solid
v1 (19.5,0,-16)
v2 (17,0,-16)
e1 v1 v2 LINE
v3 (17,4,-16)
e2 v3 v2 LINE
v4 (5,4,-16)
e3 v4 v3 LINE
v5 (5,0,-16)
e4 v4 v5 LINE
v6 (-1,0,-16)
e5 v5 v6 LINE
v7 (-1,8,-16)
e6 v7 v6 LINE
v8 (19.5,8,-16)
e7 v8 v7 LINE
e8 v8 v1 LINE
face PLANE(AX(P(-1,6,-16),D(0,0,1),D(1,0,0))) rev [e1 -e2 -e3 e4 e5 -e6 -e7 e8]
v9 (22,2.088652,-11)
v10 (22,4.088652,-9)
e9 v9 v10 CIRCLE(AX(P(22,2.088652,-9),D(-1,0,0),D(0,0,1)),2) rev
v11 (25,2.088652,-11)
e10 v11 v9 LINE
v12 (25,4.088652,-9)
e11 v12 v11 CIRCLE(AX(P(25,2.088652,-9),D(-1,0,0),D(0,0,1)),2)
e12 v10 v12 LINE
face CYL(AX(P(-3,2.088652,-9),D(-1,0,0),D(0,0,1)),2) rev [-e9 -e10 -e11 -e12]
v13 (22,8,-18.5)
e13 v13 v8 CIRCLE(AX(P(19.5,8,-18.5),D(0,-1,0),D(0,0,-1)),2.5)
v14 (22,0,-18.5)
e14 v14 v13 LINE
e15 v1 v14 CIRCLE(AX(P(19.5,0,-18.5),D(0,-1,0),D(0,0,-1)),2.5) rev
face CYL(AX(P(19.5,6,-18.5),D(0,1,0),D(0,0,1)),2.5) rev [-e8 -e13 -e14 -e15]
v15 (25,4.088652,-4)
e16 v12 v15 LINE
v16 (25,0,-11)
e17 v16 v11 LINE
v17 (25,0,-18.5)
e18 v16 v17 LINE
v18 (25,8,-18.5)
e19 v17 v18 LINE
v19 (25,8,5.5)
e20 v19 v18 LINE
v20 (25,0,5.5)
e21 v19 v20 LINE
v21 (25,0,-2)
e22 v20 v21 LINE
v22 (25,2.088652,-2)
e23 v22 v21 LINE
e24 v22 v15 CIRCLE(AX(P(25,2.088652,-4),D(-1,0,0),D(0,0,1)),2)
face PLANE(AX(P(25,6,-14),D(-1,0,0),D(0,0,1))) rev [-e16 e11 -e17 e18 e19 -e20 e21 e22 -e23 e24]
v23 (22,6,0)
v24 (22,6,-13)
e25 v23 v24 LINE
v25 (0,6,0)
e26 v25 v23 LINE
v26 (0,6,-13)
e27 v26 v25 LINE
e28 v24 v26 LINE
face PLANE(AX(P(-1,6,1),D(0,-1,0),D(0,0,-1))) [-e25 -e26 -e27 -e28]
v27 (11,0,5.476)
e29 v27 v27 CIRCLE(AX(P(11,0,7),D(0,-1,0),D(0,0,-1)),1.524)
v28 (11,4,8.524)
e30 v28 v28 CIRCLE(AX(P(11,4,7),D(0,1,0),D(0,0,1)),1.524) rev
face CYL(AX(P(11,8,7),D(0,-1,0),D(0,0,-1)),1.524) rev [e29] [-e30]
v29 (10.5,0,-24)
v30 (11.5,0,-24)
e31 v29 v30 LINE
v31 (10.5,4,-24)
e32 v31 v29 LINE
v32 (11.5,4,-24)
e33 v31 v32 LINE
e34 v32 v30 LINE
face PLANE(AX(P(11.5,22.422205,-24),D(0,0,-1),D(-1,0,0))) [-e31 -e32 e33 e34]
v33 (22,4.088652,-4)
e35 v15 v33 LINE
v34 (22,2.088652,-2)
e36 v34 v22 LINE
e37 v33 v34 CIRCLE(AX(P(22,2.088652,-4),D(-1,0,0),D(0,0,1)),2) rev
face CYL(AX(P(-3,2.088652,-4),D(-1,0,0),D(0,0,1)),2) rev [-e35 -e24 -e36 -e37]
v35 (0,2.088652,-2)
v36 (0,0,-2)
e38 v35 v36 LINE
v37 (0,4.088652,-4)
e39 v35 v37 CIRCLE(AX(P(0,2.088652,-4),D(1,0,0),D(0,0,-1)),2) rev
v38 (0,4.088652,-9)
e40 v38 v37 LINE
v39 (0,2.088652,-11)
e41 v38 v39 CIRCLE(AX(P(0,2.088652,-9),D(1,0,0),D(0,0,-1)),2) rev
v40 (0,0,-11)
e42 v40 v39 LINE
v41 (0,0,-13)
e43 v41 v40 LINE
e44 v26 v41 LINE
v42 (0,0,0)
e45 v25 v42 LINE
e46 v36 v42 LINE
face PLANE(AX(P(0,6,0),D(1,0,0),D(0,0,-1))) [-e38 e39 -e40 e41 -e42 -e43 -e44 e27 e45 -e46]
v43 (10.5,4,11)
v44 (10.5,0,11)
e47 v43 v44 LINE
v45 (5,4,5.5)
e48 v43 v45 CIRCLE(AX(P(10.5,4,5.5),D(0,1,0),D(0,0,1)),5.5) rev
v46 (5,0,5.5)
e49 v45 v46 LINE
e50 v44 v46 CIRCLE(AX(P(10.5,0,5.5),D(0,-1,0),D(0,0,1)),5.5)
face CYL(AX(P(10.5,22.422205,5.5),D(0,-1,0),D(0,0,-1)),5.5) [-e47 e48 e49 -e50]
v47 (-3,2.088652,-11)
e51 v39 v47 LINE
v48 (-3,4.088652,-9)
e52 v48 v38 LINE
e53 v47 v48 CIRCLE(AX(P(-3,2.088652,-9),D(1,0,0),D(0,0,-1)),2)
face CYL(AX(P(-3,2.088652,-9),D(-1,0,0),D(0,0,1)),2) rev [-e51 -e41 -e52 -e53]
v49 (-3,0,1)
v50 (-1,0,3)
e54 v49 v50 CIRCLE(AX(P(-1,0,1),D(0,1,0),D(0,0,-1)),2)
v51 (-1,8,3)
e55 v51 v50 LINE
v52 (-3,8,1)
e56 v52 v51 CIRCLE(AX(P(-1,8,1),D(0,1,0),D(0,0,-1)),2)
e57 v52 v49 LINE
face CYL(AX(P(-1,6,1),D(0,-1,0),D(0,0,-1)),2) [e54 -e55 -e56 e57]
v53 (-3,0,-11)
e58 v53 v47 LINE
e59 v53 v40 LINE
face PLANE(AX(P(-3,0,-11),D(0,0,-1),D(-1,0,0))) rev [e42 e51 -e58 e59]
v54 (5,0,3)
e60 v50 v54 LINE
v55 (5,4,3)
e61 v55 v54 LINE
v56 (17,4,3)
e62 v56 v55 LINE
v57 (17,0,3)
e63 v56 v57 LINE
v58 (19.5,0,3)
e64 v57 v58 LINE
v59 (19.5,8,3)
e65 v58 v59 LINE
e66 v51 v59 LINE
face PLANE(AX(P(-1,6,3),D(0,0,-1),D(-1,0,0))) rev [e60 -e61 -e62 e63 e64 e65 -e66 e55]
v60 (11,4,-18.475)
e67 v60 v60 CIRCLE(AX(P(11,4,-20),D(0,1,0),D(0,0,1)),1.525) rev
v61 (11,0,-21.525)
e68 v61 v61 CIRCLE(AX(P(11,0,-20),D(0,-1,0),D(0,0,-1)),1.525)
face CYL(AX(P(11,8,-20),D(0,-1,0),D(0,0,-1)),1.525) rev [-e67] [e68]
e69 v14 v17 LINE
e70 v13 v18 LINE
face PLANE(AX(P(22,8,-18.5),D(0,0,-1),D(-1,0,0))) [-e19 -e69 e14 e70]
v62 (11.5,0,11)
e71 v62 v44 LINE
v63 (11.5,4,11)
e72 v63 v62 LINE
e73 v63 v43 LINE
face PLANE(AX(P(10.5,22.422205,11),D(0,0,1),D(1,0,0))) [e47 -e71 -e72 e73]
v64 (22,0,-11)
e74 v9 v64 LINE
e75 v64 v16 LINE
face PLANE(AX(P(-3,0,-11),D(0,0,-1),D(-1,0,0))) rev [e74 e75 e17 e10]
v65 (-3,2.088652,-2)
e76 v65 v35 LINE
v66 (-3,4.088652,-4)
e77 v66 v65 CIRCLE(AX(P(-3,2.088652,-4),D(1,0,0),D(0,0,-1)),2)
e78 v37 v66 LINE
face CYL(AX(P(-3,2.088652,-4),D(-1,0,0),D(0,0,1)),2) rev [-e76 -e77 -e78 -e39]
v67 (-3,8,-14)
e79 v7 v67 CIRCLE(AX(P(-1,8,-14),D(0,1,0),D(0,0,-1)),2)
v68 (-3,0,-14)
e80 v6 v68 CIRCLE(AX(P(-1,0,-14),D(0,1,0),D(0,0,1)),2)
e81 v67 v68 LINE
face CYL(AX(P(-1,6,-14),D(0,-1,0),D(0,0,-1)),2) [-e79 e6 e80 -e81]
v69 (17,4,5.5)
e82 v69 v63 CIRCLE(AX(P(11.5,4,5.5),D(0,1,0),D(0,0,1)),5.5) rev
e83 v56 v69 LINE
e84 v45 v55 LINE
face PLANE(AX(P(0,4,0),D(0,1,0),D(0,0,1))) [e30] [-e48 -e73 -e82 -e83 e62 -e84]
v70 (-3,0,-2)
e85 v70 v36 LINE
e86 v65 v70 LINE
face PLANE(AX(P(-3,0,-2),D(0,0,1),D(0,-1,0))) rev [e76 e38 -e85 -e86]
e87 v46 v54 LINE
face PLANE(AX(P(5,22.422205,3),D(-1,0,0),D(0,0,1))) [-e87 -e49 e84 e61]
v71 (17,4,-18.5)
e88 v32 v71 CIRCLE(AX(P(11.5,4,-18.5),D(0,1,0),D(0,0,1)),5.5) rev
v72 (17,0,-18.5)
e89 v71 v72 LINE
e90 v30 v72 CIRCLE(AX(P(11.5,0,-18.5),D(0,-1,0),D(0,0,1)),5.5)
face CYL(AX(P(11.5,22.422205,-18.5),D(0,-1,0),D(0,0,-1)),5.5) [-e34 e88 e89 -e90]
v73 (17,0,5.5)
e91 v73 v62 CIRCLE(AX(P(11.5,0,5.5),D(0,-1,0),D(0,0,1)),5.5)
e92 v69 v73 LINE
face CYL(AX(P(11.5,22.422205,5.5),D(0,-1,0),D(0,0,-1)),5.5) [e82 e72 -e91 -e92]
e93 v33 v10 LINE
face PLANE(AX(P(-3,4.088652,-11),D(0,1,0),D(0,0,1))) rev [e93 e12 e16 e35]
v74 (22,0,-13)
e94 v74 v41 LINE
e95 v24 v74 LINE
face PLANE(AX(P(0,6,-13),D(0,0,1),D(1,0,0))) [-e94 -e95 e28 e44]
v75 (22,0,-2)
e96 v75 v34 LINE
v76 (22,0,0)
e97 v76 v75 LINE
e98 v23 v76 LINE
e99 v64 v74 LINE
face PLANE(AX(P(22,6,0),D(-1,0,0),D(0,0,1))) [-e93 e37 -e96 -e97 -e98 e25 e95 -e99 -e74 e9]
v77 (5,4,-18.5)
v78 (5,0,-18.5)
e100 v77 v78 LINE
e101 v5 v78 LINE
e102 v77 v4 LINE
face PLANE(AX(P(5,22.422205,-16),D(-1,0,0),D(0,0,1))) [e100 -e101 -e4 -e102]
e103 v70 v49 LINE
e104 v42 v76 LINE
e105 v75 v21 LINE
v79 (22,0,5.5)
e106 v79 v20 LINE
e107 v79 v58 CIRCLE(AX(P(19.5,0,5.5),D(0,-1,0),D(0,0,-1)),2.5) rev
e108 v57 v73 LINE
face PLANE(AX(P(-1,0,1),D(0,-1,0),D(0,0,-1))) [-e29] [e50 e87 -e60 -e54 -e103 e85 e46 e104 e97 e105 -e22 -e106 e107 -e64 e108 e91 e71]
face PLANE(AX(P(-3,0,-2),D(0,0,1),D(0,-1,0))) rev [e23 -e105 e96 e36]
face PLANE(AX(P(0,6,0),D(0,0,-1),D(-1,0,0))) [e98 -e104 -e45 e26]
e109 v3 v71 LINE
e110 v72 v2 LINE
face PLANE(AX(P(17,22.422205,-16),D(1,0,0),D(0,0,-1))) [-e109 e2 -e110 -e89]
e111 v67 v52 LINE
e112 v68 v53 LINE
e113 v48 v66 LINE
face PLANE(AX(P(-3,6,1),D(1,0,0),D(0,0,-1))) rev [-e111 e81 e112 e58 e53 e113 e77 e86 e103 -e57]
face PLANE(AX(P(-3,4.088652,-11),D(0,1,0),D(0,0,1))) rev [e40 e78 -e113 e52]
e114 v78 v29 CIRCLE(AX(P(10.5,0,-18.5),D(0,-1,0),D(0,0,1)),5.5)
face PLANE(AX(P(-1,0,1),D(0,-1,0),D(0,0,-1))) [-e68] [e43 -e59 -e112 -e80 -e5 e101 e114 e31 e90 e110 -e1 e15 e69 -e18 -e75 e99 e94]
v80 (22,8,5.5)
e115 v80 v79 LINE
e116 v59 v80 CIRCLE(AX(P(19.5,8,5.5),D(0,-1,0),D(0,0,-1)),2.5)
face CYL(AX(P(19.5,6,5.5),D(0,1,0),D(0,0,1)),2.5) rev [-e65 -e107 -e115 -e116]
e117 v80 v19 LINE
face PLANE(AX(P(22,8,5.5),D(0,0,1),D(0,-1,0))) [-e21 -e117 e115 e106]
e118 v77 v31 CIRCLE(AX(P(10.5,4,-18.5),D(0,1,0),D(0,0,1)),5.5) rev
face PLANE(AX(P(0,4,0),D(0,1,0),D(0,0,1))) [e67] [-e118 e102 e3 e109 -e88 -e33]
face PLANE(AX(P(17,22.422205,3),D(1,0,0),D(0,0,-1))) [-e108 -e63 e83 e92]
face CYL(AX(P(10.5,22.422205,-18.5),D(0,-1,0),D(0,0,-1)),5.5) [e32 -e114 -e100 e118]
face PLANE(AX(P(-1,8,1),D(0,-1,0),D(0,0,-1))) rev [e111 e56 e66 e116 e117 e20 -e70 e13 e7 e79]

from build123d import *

# Parameters (mm, degrees)
SKETCH1_W           = 22
SKETCH1_H           = 13
BOSS_EXTRUDE1_DEPTH = 6
BOSS_EXTRUDE2_DEPTH = 2
BOSS_EXTRUDE3_DEPTH = 8
SKETCH4_R           = 1.525
SKETCH4_R_2         = 1.524
CUT_EXTRUDE1_DEPTH  = 36.566838488
SKETCH5_W           = 9
SKETCH5_H           = 4.088652256
CUT_EXTRUDE2_DEPTH  = 38.735924528
FILLET1_R           = 2
SKETCH6_W           = 12
SKETCH6_H           = 13.009000019
SKETCH6_W_2         = 15.838286437
CUT_EXTRUDE3_DEPTH  = 4
SKETCH7_W           = 2.5
SKETCH7_H           = 8
BOSS_EXTRUDE5_DEPTH = 3
FILLET3_R           = 2.5
FILLET4_R           = 2.5


with BuildPart() as part:
    # Sketch1 → Boss-Extrude1 (new body)
    with BuildSketch(Plane(origin=(0, 0, 0), x_dir=(1, 0, 0), z_dir=(0, 1, 0))):
        with BuildLine():
            Line((-1, -3), (23, -3))
            Line((23, -3), (25, -3))
            Line((25, -3), (25, -1))
            Line((25, -1), (25, 14))
            Line((25, 14), (25, 16))
            Line((25, 16), (23, 16))
            Line((23, 16), (-1, 16))
            ThreePointArc((-1, 16), (-2.414213562, 15.414213562), (-3, 14))
            Line((-3, 14), (-3, -1))
            ThreePointArc((-3, -1), (-2.414213562, -2.414213562), (-1, -3))
        make_face()
        with Locations((11, 6.5)):
            Rectangle(SKETCH1_W, SKETCH1_H, mode=Mode.SUBTRACT)
    extrude(amount=BOSS_EXTRUDE1_DEPTH)

    # Sketch2 → Boss-Extrude2 (add)
    with BuildSketch(Plane(origin=(0, 6, 0), x_dir=(1, 0, 0), z_dir=(0, 1, 0))):
        with BuildLine():
            Line((25, 14), (25, -1))
            Line((25, -1), (25, -3))
            Line((25, -3), (23, -3))
            Line((23, -3), (-1, -3))
            ThreePointArc((-1, -3), (-2.414213562, -2.414213562), (-3, -1))
            Line((-3, -1), (-3, 14))
            ThreePointArc((-3, 14), (-2.414213562, 15.414213562), (-1, 16))
            Line((-1, 16), (23, 16))
            Line((23, 16), (25, 16))
            Line((25, 16), (25, 14))
        make_face()
    extrude(amount=BOSS_EXTRUDE2_DEPTH)

    # Sketch3 → Boss-Extrude3 (add)
    with BuildSketch(Plane.XZ):
        with BuildLine():
            Line((5, 3), (17, 3))
            Line((17, 3), (17, 5.5))
            ThreePointArc((17, 5.5), (15.389087297, 9.389087297), (11.5, 11))
            Line((11.5, 11), (10.5, 11))
            ThreePointArc((10.5, 11), (6.610912703, 9.389087297), (5, 5.5))
            Line((5, 5.5), (5, 3))
        make_face()
        with BuildLine():
            Line((17, -16), (5, -16))
            Line((5, -16), (5, -18.5))
            ThreePointArc((5, -18.5), (6.610912703, -22.389087297), (10.5, -24))
            Line((10.5, -24), (11.5, -24))
            ThreePointArc((11.5, -24), (15.389087297, -22.389087297), (17, -18.5))
            Line((17, -18.5), (17, -16))
        make_face()
    extrude(amount=-BOSS_EXTRUDE3_DEPTH)

    # Sketch4 → Cut-Extrude1 (cut, through all)
    with BuildSketch(Plane(origin=(0, 0, 0), x_dir=(-1, 0, 0), z_dir=(0, -1, 0))):
        with Locations(Location((-11, 20, 0), (0, 0, 90))):
            Circle(SKETCH4_R)
        with Locations(Location((-11, -7, 0), (0, 0, 90))):
            Circle(SKETCH4_R_2)
    extrude(amount=-CUT_EXTRUDE1_DEPTH, mode=Mode.SUBTRACT)

    # Sketch5 → Cut-Extrude2 (cut, through all)
    with BuildSketch(Plane(origin=(25, 0, 0), x_dir=(0, 0, -1), z_dir=(1, 0, 0))):
        with Locations((6.5, 2.044326128)):
            Rectangle(SKETCH5_W, SKETCH5_H)
    extrude(amount=-CUT_EXTRUDE2_DEPTH, mode=Mode.SUBTRACT)

    # Fillet1
    fillet1_edges = [part.edges().sort_by_distance(p)[0] for p in [
        (-1.5, 4.088652256, -11),
        (-1.5, 4.088652256, -2),
        (23.5, 4.088652256, -11),
        (23.5, 4.088652256, -2),
    ]]
    fillet(fillet1_edges, radius=FILLET1_R)

    # Sketch6 → Cut-Extrude3 (cut)
    with BuildSketch(Plane(origin=(0, 8, 0), x_dir=(1, 0, 0), z_dir=(0, 1, 0))):
        with Locations((11, 22.504500009)):
            Rectangle(SKETCH6_W, SKETCH6_H)
        with Locations((11.149066226, -9.50450001)):
            Rectangle(SKETCH6_W_2, SKETCH6_H)
    extrude(amount=-CUT_EXTRUDE3_DEPTH, mode=Mode.SUBTRACT)

    # Sketch7 → Boss-Extrude5 (add)
    with BuildSketch(Plane(origin=(25, 0, 0), x_dir=(0, 0, -1), z_dir=(1, 0, 0))):
        with Locations((17.25, 4)):
            Rectangle(SKETCH7_W, SKETCH7_H)
        with Locations((-4.25, 4)):
            Rectangle(SKETCH7_W, SKETCH7_H)
    extrude(amount=-BOSS_EXTRUDE5_DEPTH)

    # Fillet3
    fillet3_edges = [part.edges().sort_by_distance(p)[0] for p in [
        (22, 4, -16),
    ]]
    fillet(fillet3_edges, radius=FILLET3_R - 0.0001)  # a hair under: the kernel refuses the full size

    # Fillet4
    fillet4_edges = [part.edges().sort_by_distance(p)[0] for p in [
        (22, 4, 3),
    ]]
    fillet(fillet4_edges, radius=FILLET4_R - 0.0001)  # a hair under: the kernel refuses the full size


solid = part.part
